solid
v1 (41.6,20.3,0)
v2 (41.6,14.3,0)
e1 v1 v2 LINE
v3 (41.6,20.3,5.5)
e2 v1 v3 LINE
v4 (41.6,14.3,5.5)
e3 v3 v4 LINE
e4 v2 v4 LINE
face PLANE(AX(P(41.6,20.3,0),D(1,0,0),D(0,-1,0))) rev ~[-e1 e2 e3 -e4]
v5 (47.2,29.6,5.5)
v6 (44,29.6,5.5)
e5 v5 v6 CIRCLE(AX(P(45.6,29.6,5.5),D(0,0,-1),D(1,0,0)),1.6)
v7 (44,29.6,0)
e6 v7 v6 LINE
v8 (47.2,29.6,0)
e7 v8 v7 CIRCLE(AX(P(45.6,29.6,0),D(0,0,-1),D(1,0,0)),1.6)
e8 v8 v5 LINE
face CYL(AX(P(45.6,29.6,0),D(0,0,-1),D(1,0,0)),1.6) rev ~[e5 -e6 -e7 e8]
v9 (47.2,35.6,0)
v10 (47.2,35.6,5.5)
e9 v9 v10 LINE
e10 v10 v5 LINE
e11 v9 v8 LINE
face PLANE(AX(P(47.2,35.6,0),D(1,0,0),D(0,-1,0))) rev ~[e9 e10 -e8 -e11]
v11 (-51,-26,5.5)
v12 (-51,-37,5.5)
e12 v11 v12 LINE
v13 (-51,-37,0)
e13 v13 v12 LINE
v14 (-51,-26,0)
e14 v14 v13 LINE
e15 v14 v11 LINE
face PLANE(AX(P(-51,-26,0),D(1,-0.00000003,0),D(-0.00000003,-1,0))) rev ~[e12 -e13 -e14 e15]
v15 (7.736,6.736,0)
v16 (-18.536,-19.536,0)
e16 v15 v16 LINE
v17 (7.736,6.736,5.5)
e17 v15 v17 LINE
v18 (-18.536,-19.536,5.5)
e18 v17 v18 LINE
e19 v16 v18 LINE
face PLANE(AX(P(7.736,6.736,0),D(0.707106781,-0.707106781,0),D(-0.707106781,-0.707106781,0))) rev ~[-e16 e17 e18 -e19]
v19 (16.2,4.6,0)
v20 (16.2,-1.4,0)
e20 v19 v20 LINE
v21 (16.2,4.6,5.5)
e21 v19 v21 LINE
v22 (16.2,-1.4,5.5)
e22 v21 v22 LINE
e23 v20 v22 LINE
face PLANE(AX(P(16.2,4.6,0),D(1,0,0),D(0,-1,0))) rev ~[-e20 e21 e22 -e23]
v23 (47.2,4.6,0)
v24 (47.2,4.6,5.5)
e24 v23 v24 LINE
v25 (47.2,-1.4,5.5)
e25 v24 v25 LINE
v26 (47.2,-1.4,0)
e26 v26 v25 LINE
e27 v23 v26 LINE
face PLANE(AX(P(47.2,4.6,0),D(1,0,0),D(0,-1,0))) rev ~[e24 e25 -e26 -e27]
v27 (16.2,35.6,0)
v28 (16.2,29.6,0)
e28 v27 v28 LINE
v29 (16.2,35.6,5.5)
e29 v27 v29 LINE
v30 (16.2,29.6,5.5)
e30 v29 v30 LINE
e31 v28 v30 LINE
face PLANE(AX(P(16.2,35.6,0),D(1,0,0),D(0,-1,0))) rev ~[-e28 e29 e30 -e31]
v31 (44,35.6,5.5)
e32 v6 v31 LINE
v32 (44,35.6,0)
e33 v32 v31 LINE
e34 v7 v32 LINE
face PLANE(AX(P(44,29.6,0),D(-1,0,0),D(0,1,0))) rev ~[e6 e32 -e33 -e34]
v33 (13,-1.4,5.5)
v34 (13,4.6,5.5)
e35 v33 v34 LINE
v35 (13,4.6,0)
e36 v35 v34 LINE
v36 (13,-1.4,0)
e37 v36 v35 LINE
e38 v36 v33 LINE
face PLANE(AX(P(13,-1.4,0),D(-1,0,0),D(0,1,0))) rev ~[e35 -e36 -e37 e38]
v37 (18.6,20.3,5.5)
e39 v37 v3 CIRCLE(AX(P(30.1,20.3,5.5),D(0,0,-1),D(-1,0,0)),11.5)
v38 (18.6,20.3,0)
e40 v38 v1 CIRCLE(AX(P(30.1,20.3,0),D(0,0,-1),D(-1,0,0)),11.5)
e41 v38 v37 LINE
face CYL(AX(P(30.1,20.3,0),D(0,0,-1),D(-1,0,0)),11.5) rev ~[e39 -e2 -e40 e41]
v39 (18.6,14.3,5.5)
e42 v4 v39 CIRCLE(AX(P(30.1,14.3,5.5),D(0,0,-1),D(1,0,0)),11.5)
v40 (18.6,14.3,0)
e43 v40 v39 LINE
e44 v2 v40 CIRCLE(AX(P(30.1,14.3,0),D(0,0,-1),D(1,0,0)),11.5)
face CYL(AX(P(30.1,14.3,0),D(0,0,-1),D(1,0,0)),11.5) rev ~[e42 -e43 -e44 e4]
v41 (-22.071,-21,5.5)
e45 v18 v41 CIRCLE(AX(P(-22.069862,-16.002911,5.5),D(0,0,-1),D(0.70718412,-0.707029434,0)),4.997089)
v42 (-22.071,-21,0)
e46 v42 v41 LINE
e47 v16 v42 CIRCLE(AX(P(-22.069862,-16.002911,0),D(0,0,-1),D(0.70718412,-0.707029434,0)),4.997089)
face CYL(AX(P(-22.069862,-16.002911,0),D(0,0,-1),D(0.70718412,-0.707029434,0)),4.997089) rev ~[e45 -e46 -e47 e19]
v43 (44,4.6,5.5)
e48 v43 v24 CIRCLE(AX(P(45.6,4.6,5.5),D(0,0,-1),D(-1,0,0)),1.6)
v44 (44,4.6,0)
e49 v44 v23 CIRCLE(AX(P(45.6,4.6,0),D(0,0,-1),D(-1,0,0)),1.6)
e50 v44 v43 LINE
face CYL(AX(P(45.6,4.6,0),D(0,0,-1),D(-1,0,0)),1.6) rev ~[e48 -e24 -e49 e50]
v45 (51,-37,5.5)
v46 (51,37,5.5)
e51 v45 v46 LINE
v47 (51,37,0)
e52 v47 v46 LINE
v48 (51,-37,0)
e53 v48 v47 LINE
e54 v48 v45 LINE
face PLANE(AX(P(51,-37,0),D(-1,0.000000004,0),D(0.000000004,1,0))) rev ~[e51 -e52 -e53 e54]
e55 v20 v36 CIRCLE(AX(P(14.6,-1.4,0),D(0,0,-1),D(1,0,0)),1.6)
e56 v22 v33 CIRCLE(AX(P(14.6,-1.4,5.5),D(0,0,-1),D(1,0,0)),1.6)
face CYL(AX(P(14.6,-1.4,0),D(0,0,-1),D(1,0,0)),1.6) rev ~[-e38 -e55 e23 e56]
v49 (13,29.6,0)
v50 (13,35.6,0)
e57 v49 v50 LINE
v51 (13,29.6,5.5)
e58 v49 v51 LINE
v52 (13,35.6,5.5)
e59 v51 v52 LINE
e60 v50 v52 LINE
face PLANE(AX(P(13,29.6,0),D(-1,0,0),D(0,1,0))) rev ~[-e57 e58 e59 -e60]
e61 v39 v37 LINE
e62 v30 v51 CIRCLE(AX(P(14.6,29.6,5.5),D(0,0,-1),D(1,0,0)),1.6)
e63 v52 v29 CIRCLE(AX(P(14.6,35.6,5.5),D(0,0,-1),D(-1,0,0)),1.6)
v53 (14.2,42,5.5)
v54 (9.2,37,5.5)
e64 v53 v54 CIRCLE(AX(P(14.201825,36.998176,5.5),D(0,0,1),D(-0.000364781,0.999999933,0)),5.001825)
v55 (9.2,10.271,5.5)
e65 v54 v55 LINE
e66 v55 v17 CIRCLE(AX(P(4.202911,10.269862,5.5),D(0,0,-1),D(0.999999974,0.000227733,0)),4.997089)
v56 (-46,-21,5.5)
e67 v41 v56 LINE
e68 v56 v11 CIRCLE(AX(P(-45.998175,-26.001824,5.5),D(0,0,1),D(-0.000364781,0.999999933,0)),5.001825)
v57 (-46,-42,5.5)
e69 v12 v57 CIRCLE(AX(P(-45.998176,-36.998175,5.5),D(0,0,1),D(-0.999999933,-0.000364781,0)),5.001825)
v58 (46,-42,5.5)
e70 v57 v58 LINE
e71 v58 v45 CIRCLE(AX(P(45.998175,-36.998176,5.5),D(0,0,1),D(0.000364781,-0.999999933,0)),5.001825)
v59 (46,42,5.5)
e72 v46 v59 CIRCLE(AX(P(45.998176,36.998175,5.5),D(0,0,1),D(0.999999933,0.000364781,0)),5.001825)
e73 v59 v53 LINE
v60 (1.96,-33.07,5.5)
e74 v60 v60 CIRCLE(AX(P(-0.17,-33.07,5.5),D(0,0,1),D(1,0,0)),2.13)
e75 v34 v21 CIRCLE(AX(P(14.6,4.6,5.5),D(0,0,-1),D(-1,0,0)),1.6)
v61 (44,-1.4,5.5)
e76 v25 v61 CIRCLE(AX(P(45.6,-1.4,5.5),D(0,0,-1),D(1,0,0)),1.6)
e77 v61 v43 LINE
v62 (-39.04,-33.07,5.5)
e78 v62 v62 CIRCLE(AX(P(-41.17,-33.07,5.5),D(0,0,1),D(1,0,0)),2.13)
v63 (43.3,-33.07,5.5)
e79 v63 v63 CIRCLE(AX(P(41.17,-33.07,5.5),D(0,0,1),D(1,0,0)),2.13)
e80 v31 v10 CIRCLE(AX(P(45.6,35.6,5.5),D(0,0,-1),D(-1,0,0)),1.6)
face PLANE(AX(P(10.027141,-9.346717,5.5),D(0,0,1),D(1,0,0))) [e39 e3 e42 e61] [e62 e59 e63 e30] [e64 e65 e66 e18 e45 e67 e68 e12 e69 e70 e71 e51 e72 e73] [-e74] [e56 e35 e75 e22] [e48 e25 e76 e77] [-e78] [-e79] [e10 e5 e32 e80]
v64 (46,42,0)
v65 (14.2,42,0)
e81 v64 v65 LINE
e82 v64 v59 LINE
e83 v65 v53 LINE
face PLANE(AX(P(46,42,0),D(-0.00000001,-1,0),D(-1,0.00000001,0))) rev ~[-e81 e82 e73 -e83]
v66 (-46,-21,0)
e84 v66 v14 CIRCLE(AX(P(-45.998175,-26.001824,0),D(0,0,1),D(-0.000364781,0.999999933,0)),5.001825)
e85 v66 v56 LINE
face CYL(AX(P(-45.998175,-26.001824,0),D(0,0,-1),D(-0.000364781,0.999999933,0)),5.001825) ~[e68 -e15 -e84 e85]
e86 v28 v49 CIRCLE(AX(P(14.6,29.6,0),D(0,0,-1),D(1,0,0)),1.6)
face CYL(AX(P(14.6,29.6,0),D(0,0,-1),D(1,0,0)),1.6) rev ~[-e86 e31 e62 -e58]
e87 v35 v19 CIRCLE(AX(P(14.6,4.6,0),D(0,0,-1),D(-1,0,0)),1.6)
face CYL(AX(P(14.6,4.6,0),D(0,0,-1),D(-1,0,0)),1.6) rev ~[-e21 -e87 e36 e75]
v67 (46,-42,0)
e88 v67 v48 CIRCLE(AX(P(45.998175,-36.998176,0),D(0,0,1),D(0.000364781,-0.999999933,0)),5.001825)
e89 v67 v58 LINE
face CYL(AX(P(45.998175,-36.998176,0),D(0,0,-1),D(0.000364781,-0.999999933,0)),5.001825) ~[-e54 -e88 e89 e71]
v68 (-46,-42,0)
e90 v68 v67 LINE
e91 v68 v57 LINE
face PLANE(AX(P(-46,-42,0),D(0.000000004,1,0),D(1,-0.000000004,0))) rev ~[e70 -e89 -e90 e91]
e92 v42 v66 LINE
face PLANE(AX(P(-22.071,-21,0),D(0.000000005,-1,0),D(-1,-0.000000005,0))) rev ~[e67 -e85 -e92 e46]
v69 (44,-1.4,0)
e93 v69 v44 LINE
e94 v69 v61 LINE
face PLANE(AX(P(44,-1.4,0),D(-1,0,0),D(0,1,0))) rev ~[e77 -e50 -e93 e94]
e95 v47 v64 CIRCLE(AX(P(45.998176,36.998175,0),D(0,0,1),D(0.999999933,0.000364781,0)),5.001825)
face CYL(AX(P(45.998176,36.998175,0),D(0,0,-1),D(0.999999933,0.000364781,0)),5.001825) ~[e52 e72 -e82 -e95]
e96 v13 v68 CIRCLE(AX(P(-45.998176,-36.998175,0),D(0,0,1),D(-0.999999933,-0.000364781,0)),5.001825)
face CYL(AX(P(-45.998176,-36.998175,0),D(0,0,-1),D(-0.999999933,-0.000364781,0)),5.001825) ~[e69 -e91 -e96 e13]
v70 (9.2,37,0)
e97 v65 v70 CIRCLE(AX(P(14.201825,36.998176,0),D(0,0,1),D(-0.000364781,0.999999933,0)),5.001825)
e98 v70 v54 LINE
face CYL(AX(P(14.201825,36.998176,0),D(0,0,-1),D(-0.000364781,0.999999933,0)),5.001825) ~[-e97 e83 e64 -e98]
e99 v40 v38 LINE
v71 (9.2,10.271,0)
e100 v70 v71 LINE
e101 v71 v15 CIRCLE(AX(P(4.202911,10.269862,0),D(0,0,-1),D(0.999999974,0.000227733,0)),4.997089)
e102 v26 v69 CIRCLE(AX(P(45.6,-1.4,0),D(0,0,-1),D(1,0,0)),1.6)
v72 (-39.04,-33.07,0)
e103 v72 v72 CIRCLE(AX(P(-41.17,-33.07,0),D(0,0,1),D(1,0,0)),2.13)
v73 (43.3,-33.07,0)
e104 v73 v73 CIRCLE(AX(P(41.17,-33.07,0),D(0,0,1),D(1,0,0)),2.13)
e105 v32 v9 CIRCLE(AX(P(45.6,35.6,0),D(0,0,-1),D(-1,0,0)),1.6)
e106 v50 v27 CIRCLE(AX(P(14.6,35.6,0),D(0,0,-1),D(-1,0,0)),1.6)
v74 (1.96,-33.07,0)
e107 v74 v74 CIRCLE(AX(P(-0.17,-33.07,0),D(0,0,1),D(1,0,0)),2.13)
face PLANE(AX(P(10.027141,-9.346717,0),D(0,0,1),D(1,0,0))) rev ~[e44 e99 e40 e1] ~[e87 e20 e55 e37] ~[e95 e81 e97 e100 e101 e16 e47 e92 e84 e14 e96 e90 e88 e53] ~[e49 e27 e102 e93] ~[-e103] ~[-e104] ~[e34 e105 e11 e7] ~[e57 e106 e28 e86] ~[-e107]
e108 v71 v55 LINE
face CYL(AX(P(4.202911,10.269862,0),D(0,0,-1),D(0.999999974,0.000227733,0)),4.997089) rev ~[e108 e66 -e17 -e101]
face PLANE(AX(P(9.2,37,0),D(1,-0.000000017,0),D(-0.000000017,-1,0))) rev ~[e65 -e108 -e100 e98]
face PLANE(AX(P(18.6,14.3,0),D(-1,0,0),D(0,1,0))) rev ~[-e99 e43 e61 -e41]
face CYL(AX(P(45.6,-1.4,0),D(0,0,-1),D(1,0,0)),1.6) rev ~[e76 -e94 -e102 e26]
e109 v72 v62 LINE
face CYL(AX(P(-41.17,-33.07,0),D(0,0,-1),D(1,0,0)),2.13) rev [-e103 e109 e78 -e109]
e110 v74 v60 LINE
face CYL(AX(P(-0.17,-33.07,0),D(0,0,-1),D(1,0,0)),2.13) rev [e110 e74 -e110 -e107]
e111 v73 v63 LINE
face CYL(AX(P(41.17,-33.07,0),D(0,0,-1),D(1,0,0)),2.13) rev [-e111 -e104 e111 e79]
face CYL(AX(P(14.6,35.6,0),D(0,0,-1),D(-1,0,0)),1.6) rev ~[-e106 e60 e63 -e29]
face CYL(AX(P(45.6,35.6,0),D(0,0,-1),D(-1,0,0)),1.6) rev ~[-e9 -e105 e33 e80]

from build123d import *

# Parameters (mm, degrees)
F0_R     = 2.13
F1_DEPTH = 5.5


# Not quite as in the source:
# - ends of sketch curves that miss each other by under 0.0002 mm in the source are joined


with BuildPart() as f1:
    # F0 (on Top) → F1 (new body)
    with BuildSketch(Plane.XY):
        with BuildLine():
            ThreePointArc((9.1999998704, 10.271), (8.8197324019, 8.3578320272), (7.735999997, 6.736000003))
            Line((7.735999997, 6.736000003), (-18.536, -19.536))
            ThreePointArc((-18.536, -19.536), (-20.1578320272, -20.6197324019), (-22.071, -20.9999998704))
            Line((-22.071, -20.9999998704), (-46, -21))
            ThreePointArc((-46, -21), (-49.5349996687, -22.4650003313), (-50.9999996674, -26.0000000001))
            Line((-50.9999996674, -26.0000000001), (-51, -37))
            ThreePointArc((-51, -37), (-49.5349996687, -40.5349996687), (-45.9999999999, -41.9999996674))
            Line((-45.9999999999, -41.9999996674), (46, -42))
            ThreePointArc((46, -42), (49.5349996687, -40.5349996687), (50.9999996674, -36.9999999999))
            Line((50.9999996674, -36.9999999999), (51, 37))
            ThreePointArc((51, 37), (49.5349996687, 40.5349996687), (45.9999999999, 41.9999996674))
            Line((45.9999999999, 41.9999996674), (14.2, 42))
            ThreePointArc((14.2, 42), (10.6650003313, 40.5349996687), (9.2000003326, 36.9999999999))
            Line((9.2000003326, 36.9999999999), (9.1999998704, 10.271))
        make_face()
        with Locations((-41.17, -33.07)):
            Circle(F0_R, mode=Mode.SUBTRACT)
        with Locations((-0.17, -33.07)):
            Circle(F0_R, mode=Mode.SUBTRACT)
        with Locations((41.17, -33.07)):
            Circle(F0_R, mode=Mode.SUBTRACT)
        with BuildLine():
            ThreePointArc((13, 4.6), (14.6, 6.2), (16.2, 4.6))
            Line((16.2, 4.6), (16.2, -1.4))
            ThreePointArc((16.2, -1.4), (14.6, -3), (13, -1.4))
            Line((13, -1.4), (13, 4.6))
        make_face(mode=Mode.SUBTRACT)
        with BuildLine():
            Line((47.2, 4.6), (47.2, -1.4))
            ThreePointArc((47.2, -1.4), (45.6, -3), (44, -1.4))
            Line((44, -1.4), (44, 4.6))
            ThreePointArc((44, 4.6), (45.6, 6.2), (47.2, 4.6))
        make_face(mode=Mode.SUBTRACT)
        with BuildLine():
            ThreePointArc((41.6, 14.3), (30.1, 2.8), (18.6, 14.3))
            Line((18.6, 14.3), (18.6, 20.3))
            ThreePointArc((18.6, 20.3), (30.1, 31.8), (41.6, 20.3))
            Line((41.6, 20.3), (41.6, 14.3))
        make_face(mode=Mode.SUBTRACT)
        with BuildLine():
            ThreePointArc((13, 35.6), (14.6, 37.2), (16.2, 35.6))
            Line((16.2, 35.6), (16.2, 29.6))
            ThreePointArc((16.2, 29.6), (14.6, 28), (13, 29.6))
            Line((13, 29.6), (13, 35.6))
        make_face(mode=Mode.SUBTRACT)
        with BuildLine():
            Line((47.2, 35.6), (47.2, 29.6))
            ThreePointArc((47.2, 29.6), (45.6, 28), (44, 29.6))
            Line((44, 29.6), (44, 35.6))
            ThreePointArc((44, 35.6), (45.6, 37.2), (47.2, 35.6))
        make_face(mode=Mode.SUBTRACT)
    extrude(amount=F1_DEPTH)


solid = f1.part
